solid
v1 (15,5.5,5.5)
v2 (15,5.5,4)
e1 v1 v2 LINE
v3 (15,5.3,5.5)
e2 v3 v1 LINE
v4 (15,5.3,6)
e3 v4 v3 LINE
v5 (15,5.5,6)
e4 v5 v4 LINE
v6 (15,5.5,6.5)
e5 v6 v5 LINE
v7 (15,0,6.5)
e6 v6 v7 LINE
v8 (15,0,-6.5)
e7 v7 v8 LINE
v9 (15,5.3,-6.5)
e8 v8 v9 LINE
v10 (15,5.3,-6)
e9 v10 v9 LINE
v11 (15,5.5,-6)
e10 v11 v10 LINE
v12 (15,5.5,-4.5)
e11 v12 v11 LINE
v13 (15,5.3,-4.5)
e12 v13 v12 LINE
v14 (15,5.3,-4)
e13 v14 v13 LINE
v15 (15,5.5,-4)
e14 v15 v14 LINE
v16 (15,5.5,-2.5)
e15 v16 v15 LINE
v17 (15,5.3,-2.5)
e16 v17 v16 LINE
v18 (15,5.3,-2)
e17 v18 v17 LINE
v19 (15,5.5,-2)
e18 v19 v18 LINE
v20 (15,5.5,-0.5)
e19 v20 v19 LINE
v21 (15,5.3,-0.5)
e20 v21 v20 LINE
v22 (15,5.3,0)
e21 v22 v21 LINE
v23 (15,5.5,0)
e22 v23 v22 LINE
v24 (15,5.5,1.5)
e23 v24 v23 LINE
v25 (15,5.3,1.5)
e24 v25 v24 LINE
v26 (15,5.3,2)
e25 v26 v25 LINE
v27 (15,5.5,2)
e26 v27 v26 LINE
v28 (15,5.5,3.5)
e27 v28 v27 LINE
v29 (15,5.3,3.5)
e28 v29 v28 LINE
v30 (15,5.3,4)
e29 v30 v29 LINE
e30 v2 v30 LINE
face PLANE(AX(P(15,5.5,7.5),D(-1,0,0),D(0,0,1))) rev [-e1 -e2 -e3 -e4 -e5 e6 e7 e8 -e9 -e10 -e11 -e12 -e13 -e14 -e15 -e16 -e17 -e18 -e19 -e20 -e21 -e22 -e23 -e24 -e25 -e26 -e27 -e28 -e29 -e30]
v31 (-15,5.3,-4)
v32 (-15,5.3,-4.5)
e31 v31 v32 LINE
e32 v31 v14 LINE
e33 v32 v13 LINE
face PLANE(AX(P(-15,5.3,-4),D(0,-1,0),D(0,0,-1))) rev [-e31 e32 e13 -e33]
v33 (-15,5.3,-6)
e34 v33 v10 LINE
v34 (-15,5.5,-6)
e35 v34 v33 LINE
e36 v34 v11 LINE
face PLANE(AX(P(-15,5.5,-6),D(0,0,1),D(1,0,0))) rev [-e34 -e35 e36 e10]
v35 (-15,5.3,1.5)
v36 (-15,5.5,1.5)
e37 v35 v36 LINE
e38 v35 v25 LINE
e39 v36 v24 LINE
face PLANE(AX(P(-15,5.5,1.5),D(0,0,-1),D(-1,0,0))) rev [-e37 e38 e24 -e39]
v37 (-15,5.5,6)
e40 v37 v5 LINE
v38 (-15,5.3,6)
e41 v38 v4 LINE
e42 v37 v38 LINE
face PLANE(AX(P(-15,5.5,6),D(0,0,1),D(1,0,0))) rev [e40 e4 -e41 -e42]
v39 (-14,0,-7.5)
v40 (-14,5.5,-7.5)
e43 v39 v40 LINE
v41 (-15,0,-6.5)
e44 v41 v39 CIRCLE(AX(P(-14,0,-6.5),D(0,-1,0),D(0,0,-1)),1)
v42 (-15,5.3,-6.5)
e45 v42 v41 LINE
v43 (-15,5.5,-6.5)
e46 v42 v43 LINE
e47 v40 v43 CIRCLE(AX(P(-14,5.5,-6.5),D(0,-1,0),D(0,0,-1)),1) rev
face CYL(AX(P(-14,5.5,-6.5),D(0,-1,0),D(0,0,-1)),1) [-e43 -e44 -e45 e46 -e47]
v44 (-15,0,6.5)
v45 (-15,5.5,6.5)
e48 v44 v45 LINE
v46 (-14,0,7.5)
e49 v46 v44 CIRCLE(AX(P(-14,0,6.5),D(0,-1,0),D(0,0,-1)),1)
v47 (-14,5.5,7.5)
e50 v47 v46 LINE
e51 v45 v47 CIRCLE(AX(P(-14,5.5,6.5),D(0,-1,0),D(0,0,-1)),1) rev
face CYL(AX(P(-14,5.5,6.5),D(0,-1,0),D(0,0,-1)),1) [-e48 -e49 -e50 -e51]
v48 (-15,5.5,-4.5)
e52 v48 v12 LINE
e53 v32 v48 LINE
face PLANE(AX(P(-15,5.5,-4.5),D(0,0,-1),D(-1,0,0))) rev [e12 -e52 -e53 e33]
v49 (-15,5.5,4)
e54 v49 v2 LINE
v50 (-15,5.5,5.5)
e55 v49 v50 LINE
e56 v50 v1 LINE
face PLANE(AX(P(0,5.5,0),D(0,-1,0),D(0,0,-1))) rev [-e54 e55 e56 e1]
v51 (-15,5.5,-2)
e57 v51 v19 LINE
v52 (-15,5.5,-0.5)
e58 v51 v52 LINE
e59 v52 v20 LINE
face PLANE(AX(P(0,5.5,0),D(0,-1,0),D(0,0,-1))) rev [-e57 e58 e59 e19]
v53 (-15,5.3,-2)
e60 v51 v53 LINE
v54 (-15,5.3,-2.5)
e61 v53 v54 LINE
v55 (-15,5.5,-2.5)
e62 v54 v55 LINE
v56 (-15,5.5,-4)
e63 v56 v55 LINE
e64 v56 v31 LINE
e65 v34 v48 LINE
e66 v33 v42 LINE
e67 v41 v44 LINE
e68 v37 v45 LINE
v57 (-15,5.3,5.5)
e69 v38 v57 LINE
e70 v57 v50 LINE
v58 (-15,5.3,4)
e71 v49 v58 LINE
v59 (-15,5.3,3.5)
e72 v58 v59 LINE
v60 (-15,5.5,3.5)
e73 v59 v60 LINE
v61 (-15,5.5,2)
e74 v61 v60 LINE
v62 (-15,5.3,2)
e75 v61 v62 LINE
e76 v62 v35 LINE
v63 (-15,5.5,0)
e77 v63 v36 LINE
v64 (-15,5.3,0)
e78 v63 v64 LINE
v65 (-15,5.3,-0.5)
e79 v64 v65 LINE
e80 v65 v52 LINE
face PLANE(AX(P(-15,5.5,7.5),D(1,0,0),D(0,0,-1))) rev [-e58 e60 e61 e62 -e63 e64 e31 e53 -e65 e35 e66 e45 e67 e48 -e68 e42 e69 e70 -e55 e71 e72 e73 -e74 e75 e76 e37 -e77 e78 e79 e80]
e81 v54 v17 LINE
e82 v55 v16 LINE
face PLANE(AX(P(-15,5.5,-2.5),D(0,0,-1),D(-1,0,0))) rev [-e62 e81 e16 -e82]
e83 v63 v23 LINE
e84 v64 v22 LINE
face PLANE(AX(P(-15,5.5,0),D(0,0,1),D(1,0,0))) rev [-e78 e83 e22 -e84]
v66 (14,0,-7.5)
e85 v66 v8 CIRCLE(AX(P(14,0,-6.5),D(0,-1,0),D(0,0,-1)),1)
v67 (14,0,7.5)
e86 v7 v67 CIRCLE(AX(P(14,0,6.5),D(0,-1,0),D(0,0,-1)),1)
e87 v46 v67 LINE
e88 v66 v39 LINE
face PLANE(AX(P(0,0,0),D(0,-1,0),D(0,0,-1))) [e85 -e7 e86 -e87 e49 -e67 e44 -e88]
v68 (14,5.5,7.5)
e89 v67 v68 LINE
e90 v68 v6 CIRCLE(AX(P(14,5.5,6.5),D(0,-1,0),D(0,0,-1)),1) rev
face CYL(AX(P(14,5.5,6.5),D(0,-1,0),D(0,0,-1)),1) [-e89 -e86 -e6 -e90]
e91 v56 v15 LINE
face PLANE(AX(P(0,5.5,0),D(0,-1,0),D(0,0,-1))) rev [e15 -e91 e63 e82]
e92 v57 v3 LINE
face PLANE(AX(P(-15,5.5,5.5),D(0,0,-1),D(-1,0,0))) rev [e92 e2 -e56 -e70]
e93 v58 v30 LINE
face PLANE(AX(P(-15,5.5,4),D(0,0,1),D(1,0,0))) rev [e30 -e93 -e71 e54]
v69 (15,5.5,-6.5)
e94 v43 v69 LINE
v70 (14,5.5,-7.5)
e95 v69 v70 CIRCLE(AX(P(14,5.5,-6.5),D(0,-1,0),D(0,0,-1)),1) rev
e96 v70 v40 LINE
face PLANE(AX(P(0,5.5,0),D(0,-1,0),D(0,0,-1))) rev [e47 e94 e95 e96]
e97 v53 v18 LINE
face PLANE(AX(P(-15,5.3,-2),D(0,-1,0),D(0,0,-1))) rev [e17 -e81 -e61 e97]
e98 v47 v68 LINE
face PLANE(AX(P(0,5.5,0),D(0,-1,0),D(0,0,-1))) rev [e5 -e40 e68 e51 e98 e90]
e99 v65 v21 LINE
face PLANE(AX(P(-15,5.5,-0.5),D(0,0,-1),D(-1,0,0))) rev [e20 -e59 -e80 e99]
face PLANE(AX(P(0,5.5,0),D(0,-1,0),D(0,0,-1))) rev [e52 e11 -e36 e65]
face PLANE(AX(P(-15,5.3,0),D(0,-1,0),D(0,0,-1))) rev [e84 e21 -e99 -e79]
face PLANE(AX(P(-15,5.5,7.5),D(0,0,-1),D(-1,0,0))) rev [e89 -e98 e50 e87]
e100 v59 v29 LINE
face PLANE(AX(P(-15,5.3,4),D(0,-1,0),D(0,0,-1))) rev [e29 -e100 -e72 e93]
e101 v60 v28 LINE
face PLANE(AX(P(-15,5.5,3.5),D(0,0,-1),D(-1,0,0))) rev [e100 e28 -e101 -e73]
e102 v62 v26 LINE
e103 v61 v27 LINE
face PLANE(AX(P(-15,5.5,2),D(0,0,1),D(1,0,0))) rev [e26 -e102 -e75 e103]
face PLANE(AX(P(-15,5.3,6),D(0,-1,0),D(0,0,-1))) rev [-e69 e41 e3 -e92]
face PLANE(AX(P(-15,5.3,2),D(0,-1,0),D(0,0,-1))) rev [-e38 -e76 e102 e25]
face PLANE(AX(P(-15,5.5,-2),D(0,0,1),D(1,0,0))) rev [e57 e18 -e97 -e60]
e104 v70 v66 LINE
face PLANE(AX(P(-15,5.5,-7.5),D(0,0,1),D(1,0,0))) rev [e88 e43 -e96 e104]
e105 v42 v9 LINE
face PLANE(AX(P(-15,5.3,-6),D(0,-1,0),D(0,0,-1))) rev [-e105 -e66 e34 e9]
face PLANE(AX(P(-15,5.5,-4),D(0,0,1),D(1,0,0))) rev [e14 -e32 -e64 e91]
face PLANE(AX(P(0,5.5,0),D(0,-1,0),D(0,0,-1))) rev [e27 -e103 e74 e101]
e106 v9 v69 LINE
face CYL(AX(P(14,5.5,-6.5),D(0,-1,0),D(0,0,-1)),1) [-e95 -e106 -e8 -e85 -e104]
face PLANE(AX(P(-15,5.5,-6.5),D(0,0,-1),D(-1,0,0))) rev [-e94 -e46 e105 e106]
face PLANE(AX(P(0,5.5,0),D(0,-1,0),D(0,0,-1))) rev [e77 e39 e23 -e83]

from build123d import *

# Parameters (mm, degrees)
SKETCH1_W               = 30
SKETCH1_H               = 15
BOSS_EXTRUDE1_DEPTH     = 5.5
CUT_EXTRUDE2_DEPTH      = 18.649362595
CUT_EXTRUDE2_DEPTH_BACK = 18.649362595
SKETCH2_W               = 0.5
SKETCH2_H               = 0.2
FILLET1_R               = 1


with BuildPart() as part:
    # Sketch1 → Boss-Extrude1 (new body)
    with BuildSketch(Plane(origin=(0, 0, 0), x_dir=(1, 0, 0), z_dir=(0, 1, 0))):
        Rectangle(SKETCH1_W, SKETCH1_H)
    extrude(amount=BOSS_EXTRUDE1_DEPTH)

    # Sketch2 → Cut-Extrude2 (cut, two sides: drawn at the far end of the back side and taken through both)
    with BuildSketch(Plane(origin=(0, 0, 0), x_dir=(0, 0, -1), z_dir=(1, 0, 0)).offset(-CUT_EXTRUDE2_DEPTH_BACK)):
        with Locations((-5.75, 5.4)):
            Rectangle(SKETCH2_W, SKETCH2_H)
        with Locations((-3.75, 5.4)):
            Rectangle(SKETCH2_W, SKETCH2_H)
        with Locations((-1.75, 5.4)):
            Rectangle(SKETCH2_W, SKETCH2_H)
        with Locations((0.25, 5.4)):
            Rectangle(SKETCH2_W, SKETCH2_H)
        with Locations((2.25, 5.4)):
            Rectangle(SKETCH2_W, SKETCH2_H)
        with Locations((4.25, 5.4)):
            Rectangle(SKETCH2_W, SKETCH2_H)
        with Locations((6.25, 5.4)):
            Rectangle(SKETCH2_W, SKETCH2_H)
    extrude(amount=CUT_EXTRUDE2_DEPTH + CUT_EXTRUDE2_DEPTH_BACK, mode=Mode.SUBTRACT)

    # Fillet1
    fillet1_edges = [part.edges().sort_by_distance(p)[0] for p in [
        (-15, 2.75, -7.5),
        (15, 2.75, -7.5),
        (15, 2.75, 7.5),
        (-15, 2.75, 7.5),
    ]]
    fillet(fillet1_edges, radius=FILLET1_R - 0.0001)  # a hair under: the kernel refuses the full size


solid = part.part
